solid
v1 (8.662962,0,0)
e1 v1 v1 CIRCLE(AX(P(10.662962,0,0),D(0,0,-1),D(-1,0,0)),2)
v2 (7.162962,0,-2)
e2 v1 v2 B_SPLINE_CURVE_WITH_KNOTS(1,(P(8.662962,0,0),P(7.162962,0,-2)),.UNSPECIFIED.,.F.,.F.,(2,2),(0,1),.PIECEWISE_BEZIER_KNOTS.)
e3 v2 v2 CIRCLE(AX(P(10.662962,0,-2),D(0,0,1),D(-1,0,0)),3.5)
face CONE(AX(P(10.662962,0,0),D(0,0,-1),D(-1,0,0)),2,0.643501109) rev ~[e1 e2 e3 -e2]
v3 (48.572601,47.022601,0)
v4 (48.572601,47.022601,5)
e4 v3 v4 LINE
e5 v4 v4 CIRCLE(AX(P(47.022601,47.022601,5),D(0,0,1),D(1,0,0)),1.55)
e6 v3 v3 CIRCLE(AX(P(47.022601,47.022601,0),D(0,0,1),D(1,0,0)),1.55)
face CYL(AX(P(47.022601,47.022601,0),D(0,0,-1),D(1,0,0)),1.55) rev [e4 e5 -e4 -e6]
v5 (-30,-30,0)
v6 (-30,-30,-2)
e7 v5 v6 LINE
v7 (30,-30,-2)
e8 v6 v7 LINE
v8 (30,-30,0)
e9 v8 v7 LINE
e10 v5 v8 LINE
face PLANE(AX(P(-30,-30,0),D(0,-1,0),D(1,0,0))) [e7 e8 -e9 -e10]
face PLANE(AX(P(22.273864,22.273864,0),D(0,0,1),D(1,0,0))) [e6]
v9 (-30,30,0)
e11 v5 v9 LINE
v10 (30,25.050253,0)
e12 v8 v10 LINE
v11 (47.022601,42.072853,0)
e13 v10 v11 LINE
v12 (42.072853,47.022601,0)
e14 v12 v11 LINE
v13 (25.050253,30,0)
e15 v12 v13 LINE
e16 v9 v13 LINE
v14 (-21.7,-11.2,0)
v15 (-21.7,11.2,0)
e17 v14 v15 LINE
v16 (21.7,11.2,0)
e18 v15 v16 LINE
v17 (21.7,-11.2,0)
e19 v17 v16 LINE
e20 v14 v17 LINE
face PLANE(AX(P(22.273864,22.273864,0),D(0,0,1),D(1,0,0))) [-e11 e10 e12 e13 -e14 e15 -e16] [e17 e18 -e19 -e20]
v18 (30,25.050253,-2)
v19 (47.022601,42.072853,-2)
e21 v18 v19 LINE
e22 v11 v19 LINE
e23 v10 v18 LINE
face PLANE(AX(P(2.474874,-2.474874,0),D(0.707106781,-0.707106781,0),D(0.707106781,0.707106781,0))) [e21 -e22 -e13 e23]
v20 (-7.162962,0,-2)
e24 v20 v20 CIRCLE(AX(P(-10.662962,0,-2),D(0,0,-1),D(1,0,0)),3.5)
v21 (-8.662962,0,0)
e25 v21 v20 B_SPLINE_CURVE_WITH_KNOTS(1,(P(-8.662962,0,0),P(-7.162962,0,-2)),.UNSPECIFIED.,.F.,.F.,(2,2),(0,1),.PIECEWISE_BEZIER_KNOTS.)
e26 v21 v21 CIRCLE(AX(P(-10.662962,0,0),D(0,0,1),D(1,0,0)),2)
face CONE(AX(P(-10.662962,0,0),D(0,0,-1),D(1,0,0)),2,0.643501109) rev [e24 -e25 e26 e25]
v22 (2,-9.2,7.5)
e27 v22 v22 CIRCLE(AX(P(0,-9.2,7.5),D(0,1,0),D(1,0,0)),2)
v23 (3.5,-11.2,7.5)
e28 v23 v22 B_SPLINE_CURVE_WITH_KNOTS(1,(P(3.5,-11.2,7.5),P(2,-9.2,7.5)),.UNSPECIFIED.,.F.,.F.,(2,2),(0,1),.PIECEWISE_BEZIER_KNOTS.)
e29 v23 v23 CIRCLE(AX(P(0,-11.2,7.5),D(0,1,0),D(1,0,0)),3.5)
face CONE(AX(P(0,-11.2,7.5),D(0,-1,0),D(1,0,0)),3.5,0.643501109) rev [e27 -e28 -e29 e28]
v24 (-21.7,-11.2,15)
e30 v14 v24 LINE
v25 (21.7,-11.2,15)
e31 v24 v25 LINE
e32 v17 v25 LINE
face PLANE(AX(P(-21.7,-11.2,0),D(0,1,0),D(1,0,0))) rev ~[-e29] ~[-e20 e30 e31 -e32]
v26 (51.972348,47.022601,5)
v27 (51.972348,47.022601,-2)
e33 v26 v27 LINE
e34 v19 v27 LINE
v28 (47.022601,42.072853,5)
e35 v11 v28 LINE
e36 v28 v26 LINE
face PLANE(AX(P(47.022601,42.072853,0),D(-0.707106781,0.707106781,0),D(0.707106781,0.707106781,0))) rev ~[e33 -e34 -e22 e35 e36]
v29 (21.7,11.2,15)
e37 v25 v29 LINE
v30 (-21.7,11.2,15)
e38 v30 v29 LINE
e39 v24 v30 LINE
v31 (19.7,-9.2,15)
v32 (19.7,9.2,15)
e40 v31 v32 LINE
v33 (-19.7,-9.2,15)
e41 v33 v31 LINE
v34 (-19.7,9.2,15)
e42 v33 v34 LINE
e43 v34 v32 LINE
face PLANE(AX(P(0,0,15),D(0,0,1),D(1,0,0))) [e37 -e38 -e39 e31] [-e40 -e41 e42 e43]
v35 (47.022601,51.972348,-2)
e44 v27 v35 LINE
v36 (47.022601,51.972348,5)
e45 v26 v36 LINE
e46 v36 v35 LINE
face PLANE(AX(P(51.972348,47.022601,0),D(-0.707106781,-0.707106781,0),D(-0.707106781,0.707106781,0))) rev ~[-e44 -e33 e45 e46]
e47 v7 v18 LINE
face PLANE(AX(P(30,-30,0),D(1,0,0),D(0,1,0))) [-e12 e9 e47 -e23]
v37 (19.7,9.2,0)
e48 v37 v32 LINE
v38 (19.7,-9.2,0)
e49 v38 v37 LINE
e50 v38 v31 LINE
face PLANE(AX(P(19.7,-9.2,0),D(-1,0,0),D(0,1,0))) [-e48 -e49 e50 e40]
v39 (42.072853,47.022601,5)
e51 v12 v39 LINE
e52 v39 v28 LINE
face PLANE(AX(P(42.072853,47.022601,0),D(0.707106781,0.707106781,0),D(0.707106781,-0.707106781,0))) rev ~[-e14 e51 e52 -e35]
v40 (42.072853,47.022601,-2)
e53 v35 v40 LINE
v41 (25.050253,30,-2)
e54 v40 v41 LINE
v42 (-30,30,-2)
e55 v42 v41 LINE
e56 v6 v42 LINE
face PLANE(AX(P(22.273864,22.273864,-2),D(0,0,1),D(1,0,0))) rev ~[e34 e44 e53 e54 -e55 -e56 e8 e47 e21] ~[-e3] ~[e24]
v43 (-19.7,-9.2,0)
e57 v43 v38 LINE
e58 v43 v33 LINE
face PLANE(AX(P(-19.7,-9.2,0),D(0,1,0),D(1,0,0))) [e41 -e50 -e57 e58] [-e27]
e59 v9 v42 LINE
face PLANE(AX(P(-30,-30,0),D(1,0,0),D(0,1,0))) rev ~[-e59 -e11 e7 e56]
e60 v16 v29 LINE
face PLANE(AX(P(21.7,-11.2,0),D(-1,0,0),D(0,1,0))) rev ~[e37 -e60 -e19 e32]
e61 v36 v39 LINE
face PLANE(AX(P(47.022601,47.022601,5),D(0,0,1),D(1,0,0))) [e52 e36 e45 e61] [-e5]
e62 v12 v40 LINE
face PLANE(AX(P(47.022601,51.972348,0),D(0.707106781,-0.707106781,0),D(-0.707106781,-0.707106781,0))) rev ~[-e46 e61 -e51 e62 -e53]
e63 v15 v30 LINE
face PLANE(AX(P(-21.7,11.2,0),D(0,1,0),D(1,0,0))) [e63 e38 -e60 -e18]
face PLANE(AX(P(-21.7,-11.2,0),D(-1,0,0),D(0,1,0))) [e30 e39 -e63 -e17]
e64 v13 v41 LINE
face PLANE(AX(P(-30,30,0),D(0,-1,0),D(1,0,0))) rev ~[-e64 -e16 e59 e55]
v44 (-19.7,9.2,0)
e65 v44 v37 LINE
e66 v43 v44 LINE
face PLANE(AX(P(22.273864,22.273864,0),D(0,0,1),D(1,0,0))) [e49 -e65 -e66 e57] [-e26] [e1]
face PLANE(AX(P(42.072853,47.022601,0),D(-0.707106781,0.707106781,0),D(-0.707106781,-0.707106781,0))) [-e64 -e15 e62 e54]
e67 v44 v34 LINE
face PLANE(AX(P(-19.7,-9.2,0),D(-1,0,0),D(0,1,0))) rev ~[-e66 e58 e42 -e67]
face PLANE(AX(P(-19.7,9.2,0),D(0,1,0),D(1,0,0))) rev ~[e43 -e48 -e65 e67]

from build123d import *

# Parameters (mm, degrees)
F0_W      = 60
F0_H      = 60
F0_W_2    = 43.4
F0_H_2    = 22.4
F0_W_3    = 39.4
F0_H_3    = 18.4
F0_R      = 2
F1_DEPTH  = 2
F2_R      = 1.55
F3_DEPTH  = 2
F4_DEPTH  = 15
F5_R      = 3.5
F7_R      = 3.5
F8_R      = 2
F10_DEPTH = 5


# Not quite as in the source:
# - a pattern or mirror of a feature is missing from the dataset's text; its kind, count and spacing are read off the source's solid
# - a feature names something its author has since deleted; it is built from what else it names


with BuildPart() as f1:
    # F0 (on Top) → F1 (new body)
    with BuildSketch(Plane.XY):
        Rectangle(F0_W, F0_H)
        Rectangle(F0_W_2, F0_H_2, mode=Mode.SUBTRACT)
        Rectangle(F0_W_2, F0_H_2)
        Rectangle(F0_W_3, F0_H_3, mode=Mode.SUBTRACT)
        Rectangle(F0_W_3, F0_H_3)
        with Locations((-10.6629617512, 0)):
            Circle(F0_R, mode=Mode.SUBTRACT)
        with Locations((-10.6629617512, 0)):
            Circle(F0_R)
    extrude(amount=-F1_DEPTH)

    # F2 (on Top) → F3 (join)
    with BuildSketch(Plane.XY):
        Polygon((42.0728534806, 47.0226009489), (-2.4748737342, 2.4748737342), (2.4748737342, -2.4748737342), (47.0226009489, 42.0728534806), align=None)
        Polygon((47.0226009489, 51.9723484172), (42.0728534806, 47.0226009489), (47.0226009489, 42.0728534806), (51.9723484172, 47.0226009489), align=None)
        with Locations((47.0226009489, 47.0226009489)):
            Circle(F2_R, mode=Mode.SUBTRACT)
        with Locations((47.0226009489, 47.0226009489)):
            Circle(F2_R)
    extrude(amount=-F3_DEPTH)

    # F0 (on Top) → F4 (join)
    with BuildSketch(Plane.XY):
        Rectangle(F0_W_2, F0_H_2)
        Rectangle(F0_W_3, F0_H_3, mode=Mode.SUBTRACT)
    extrude(amount=F4_DEPTH)

    # F0 (on Top) → F6 section 0
    with BuildSketch(Plane.XY):
        with Locations((-10.6629617512, 0)):
            Circle(F0_R)
    # F5 (on face) → F6 section 1
    with BuildSketch(Plane(origin=(0, 0, -2), x_dir=(1, 0, 0), z_dir=(0, 0, -1))):
        with Locations((-10.6629617512, 0)):
            Circle(F5_R)
    f6 = loft(mode=Mode.SUBTRACT)

    # F6_copies: F6 across plane
    add(f6.mirror(Plane(origin=(0, 0, 0), x_dir=(0, 0, 1), z_dir=(1, 0, 0))), mode=Mode.SUBTRACT)

    # F7 (on face) → F9 section 0
    with BuildSketch(Plane.XZ.offset(11.2)):
        with Locations((0, 7.5)):
            Circle(F7_R)
    # F8 (on face) → F9 section 1
    with BuildSketch(Plane(origin=(0, -9.2, 0), x_dir=(-1, 0, 0), z_dir=(0, 1, 0))):
        with Locations((0, 7.5)):
            Circle(F8_R)
    loft(mode=Mode.SUBTRACT)

    # F2 (on Top) → F10 (join)
    with BuildSketch(Plane.XY):
        Polygon((47.0226009489, 51.9723484172), (42.0728534806, 47.0226009489), (47.0226009489, 42.0728534806), (51.9723484172, 47.0226009489), align=None)
        with Locations((47.0226009489, 47.0226009489)):
            Circle(F2_R, mode=Mode.SUBTRACT)
    extrude(amount=F10_DEPTH)


solid = f1.part
